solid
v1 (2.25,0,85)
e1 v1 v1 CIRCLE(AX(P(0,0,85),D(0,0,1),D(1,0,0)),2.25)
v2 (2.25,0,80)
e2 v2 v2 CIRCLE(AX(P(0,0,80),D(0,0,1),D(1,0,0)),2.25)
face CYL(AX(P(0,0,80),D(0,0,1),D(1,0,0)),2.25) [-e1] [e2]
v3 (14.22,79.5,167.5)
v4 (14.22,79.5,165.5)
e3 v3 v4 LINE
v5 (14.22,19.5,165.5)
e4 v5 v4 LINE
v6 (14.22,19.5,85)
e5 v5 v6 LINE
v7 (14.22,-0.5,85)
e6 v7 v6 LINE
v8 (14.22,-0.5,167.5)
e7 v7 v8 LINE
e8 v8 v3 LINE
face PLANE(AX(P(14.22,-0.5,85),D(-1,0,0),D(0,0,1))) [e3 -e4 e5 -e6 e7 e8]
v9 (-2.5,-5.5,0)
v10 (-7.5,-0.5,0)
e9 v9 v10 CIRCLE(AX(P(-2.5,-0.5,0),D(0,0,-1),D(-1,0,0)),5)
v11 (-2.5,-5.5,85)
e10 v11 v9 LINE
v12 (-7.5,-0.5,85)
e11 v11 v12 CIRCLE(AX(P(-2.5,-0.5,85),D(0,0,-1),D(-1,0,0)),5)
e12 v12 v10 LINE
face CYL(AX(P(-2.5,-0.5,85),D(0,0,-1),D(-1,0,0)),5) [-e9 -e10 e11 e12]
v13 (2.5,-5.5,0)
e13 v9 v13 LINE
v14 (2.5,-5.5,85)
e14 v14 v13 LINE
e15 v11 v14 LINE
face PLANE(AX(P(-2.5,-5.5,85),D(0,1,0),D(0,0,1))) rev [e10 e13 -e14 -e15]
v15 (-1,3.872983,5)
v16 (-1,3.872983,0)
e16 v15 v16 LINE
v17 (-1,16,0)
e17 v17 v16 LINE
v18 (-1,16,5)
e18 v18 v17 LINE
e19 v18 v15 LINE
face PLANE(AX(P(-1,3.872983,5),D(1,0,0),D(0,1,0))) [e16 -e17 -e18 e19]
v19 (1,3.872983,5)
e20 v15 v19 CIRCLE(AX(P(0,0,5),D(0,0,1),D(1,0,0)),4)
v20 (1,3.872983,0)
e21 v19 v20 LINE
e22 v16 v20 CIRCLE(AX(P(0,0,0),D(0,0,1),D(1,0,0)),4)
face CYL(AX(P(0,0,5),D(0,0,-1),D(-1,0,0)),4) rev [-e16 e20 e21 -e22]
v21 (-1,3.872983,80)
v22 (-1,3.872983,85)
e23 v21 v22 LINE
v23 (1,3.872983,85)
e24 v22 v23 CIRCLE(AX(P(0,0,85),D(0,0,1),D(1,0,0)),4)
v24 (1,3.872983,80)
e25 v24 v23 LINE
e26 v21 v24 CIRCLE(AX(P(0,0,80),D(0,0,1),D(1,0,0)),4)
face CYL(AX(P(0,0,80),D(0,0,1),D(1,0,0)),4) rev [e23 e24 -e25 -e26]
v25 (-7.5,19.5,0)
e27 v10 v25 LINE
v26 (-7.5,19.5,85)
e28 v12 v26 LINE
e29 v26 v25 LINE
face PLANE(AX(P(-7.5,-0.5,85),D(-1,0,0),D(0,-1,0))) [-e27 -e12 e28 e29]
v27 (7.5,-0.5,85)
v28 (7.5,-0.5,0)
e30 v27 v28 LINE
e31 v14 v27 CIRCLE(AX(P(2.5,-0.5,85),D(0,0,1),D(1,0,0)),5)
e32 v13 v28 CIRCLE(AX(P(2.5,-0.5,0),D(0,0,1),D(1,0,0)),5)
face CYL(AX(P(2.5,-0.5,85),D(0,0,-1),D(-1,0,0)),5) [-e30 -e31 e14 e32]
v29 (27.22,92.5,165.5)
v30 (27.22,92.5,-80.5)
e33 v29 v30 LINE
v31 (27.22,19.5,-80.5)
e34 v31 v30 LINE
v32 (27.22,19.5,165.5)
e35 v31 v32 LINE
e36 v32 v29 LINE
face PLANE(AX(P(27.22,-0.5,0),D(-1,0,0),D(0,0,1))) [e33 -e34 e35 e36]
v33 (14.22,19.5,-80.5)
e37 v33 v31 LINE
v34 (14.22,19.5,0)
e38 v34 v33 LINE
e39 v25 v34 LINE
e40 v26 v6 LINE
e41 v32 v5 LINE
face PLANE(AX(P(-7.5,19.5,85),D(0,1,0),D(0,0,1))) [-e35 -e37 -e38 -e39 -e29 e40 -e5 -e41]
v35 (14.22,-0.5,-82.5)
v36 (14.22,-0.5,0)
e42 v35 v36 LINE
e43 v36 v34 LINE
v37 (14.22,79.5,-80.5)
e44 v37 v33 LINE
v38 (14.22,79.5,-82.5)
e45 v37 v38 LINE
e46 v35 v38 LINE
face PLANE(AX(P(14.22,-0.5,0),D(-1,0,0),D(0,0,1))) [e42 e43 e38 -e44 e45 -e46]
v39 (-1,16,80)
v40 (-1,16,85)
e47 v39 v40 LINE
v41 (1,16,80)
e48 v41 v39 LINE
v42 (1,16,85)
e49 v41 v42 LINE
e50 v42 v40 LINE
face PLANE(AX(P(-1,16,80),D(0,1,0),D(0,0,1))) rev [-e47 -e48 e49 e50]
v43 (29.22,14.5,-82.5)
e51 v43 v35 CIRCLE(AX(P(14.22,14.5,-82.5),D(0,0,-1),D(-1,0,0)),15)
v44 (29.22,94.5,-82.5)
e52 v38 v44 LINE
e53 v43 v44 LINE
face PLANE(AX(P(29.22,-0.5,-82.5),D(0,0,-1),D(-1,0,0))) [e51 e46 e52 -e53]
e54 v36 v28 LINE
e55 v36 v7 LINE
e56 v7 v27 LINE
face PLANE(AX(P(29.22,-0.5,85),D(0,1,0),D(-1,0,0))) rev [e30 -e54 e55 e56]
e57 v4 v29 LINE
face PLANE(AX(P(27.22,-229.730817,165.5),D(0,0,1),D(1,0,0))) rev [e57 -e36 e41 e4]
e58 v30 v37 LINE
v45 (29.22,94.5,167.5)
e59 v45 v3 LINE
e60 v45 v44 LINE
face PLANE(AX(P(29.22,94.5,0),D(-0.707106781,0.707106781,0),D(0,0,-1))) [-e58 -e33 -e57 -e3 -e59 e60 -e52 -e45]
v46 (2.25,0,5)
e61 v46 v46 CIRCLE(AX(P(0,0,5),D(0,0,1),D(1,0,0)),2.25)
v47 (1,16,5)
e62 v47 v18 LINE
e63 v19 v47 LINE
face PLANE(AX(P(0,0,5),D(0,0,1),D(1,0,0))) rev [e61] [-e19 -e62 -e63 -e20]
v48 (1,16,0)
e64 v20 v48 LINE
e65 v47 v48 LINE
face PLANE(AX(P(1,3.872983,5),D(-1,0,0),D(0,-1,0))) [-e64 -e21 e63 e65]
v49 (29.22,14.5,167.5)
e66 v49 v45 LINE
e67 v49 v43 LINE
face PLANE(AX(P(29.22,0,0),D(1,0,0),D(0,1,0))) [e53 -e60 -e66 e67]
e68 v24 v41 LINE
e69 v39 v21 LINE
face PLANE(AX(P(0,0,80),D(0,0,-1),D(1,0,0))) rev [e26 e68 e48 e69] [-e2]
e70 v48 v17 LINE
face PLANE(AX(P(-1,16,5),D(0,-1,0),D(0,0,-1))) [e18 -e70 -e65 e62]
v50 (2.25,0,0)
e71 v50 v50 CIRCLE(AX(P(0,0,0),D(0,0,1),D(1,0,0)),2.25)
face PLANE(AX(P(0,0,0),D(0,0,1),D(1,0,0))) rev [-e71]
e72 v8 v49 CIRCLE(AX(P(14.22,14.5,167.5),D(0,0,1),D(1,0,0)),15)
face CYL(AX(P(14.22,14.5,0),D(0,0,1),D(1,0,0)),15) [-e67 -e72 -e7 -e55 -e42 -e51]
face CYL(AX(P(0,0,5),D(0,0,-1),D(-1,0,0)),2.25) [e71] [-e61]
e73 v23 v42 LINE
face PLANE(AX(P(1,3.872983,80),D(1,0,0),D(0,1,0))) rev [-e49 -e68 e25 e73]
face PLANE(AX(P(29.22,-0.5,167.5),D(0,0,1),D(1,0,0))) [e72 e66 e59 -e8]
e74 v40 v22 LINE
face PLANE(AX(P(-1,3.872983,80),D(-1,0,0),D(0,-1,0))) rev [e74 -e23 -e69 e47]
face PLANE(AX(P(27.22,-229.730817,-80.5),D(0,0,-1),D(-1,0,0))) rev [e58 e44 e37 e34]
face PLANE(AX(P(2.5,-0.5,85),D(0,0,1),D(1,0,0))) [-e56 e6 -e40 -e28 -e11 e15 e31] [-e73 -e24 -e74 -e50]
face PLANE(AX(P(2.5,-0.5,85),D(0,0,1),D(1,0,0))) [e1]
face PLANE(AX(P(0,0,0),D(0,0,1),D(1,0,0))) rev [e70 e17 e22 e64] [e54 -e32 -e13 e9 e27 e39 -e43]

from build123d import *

# Parameters (mm, degrees)
SKETCH2_R                = 2.25
BOSS_EXTRUDE2_DEPTH      = 5
BOSS_EXTRUDE3_DEPTH      = 85
SKETCH2_2_R              = 2.25
CUT_EXTRUDE1_DEPTH       = 5
SKETCH9_W                = 20
SKETCH9_H                = 85
BOSS_EXTRUDE6_DEPTH      = 21.72
BOSS_EXTRUDE7_DEPTH      = 75
BOSS_EXTRUDE7_DEPTH_BACK = 20
FILLET2_R                = 15
SKETCH12_W               = 40
SKETCH12_H               = 246
CUT_EXTRUDE2_DEPTH       = 75
CHAMFER2_SIZE            = 15


with BuildPart() as part:
    # Sketch2 → Boss-Extrude2 (new body)
    with BuildSketch(Plane(origin=(0, 0, 0), x_dir=(0, 1, 0), z_dir=(0, 0, 1))):
        with BuildLine():
            Line((3.872983346, 1), (16, 1))
            Line((16, 1), (16, -1))
            Line((16, -1), (3.872983346, -1))
            ThreePointArc((3.872983346, -1), (-4, 0), (3.872983346, 1))
        make_face()
        with Locations(Location((0, 0, 0), (0, 0, 270))):
            Circle(SKETCH2_R, mode=Mode.SUBTRACT)
    extrude(amount=BOSS_EXTRUDE2_DEPTH)

    # Sketch4 → Boss-Extrude3 (add)
    with BuildSketch(Plane(origin=(0, 0, 0), x_dir=(1, 0, 0), z_dir=(0, 0, -1))):
        with BuildLine():
            Line((-2.5, 5.5), (2.5, 5.5))
            ThreePointArc((2.5, 5.5), (6.035533906, 4.035533906), (7.5, 0.5))
            Line((7.5, 0.5), (7.5, -19.5))
            Line((7.5, -19.5), (-7.5, -19.5))
            Line((-7.5, -19.5), (-7.5, 0.5))
            ThreePointArc((-7.5, 0.5), (-6.035533906, 4.035533906), (-2.5, 5.5))
        make_face()
    extrude(amount=-BOSS_EXTRUDE3_DEPTH)

    # Sketch2<2> → Cut-Extrude1 (cut)
    with BuildSketch(Plane(origin=(0, 0, 0), x_dir=(0, 1, 0), z_dir=(0, 0, 1))):
        with BuildLine():
            Line((3.872983346, 1), (16, 1))
            Line((16, 1), (16, -1))
            Line((16, -1), (3.872983346, -1))
            ThreePointArc((3.872983346, -1), (-4, 0), (3.872983346, 1))
        make_face()
        with Locations(Location((0, 0, 0), (0, 0, 270))):
            Circle(SKETCH2_2_R, mode=Mode.SUBTRACT)
    cut_extrude1 = extrude(amount=CUT_EXTRUDE1_DEPTH, mode=Mode.SUBTRACT)

    # Mirror1: Cut-Extrude1 across plane
    add(cut_extrude1.mirror(Plane.XY.offset(42.5)), mode=Mode.SUBTRACT)

    # Sketch9 → Boss-Extrude6 (add)
    with BuildSketch(Plane.YZ.offset(7.5)):
        with Locations((9.5, 42.5)):
            Rectangle(SKETCH9_W, SKETCH9_H)
    extrude(amount=BOSS_EXTRUDE6_DEPTH)

    # Sketch11 → Boss-Extrude7 (add, two sides: drawn at the far end of the back side and taken through both)
    with BuildSketch(Plane(origin=(0, 19.5, 0), x_dir=(-1, 0, 0), z_dir=(0, 1, 0)).offset(-BOSS_EXTRUDE7_DEPTH_BACK)):
        Polygon((-27.22, 0), (-14.22, 0), (-14.22, -82.5), (-29.22, -82.5), (-29.22, 167.5), (-14.22, 167.5), (-14.22, 85), (-27.22, 85), align=None)
    extrude(amount=BOSS_EXTRUDE7_DEPTH + BOSS_EXTRUDE7_DEPTH_BACK)

    # Fillet2
    fillet2_edges = [part.edges().sort_by_distance(p)[0] for p in [
        (29.22, -0.5, 42.5),
    ]]
    fillet(fillet2_edges, radius=FILLET2_R)

    # Sketch12 → Cut-Extrude2 (cut)
    with BuildSketch(Plane(origin=(0, 94.5, 0), x_dir=(-1, 0, 0), z_dir=(0, 1, 0))):
        with Locations((-7.22, 42.5)):
            Rectangle(SKETCH12_W, SKETCH12_H)
    extrude(amount=-CUT_EXTRUDE2_DEPTH, mode=Mode.SUBTRACT)

    # Chamfer2
    chamfer2_edges = [part.edges().sort_by_distance(p)[0] for p in [
        (14.22, 94.5, 166.5),
    ]]
    chamfer(chamfer2_edges, length=CHAMFER2_SIZE - 0.0001)  # a hair under: the kernel refuses the full size


solid = part.part
